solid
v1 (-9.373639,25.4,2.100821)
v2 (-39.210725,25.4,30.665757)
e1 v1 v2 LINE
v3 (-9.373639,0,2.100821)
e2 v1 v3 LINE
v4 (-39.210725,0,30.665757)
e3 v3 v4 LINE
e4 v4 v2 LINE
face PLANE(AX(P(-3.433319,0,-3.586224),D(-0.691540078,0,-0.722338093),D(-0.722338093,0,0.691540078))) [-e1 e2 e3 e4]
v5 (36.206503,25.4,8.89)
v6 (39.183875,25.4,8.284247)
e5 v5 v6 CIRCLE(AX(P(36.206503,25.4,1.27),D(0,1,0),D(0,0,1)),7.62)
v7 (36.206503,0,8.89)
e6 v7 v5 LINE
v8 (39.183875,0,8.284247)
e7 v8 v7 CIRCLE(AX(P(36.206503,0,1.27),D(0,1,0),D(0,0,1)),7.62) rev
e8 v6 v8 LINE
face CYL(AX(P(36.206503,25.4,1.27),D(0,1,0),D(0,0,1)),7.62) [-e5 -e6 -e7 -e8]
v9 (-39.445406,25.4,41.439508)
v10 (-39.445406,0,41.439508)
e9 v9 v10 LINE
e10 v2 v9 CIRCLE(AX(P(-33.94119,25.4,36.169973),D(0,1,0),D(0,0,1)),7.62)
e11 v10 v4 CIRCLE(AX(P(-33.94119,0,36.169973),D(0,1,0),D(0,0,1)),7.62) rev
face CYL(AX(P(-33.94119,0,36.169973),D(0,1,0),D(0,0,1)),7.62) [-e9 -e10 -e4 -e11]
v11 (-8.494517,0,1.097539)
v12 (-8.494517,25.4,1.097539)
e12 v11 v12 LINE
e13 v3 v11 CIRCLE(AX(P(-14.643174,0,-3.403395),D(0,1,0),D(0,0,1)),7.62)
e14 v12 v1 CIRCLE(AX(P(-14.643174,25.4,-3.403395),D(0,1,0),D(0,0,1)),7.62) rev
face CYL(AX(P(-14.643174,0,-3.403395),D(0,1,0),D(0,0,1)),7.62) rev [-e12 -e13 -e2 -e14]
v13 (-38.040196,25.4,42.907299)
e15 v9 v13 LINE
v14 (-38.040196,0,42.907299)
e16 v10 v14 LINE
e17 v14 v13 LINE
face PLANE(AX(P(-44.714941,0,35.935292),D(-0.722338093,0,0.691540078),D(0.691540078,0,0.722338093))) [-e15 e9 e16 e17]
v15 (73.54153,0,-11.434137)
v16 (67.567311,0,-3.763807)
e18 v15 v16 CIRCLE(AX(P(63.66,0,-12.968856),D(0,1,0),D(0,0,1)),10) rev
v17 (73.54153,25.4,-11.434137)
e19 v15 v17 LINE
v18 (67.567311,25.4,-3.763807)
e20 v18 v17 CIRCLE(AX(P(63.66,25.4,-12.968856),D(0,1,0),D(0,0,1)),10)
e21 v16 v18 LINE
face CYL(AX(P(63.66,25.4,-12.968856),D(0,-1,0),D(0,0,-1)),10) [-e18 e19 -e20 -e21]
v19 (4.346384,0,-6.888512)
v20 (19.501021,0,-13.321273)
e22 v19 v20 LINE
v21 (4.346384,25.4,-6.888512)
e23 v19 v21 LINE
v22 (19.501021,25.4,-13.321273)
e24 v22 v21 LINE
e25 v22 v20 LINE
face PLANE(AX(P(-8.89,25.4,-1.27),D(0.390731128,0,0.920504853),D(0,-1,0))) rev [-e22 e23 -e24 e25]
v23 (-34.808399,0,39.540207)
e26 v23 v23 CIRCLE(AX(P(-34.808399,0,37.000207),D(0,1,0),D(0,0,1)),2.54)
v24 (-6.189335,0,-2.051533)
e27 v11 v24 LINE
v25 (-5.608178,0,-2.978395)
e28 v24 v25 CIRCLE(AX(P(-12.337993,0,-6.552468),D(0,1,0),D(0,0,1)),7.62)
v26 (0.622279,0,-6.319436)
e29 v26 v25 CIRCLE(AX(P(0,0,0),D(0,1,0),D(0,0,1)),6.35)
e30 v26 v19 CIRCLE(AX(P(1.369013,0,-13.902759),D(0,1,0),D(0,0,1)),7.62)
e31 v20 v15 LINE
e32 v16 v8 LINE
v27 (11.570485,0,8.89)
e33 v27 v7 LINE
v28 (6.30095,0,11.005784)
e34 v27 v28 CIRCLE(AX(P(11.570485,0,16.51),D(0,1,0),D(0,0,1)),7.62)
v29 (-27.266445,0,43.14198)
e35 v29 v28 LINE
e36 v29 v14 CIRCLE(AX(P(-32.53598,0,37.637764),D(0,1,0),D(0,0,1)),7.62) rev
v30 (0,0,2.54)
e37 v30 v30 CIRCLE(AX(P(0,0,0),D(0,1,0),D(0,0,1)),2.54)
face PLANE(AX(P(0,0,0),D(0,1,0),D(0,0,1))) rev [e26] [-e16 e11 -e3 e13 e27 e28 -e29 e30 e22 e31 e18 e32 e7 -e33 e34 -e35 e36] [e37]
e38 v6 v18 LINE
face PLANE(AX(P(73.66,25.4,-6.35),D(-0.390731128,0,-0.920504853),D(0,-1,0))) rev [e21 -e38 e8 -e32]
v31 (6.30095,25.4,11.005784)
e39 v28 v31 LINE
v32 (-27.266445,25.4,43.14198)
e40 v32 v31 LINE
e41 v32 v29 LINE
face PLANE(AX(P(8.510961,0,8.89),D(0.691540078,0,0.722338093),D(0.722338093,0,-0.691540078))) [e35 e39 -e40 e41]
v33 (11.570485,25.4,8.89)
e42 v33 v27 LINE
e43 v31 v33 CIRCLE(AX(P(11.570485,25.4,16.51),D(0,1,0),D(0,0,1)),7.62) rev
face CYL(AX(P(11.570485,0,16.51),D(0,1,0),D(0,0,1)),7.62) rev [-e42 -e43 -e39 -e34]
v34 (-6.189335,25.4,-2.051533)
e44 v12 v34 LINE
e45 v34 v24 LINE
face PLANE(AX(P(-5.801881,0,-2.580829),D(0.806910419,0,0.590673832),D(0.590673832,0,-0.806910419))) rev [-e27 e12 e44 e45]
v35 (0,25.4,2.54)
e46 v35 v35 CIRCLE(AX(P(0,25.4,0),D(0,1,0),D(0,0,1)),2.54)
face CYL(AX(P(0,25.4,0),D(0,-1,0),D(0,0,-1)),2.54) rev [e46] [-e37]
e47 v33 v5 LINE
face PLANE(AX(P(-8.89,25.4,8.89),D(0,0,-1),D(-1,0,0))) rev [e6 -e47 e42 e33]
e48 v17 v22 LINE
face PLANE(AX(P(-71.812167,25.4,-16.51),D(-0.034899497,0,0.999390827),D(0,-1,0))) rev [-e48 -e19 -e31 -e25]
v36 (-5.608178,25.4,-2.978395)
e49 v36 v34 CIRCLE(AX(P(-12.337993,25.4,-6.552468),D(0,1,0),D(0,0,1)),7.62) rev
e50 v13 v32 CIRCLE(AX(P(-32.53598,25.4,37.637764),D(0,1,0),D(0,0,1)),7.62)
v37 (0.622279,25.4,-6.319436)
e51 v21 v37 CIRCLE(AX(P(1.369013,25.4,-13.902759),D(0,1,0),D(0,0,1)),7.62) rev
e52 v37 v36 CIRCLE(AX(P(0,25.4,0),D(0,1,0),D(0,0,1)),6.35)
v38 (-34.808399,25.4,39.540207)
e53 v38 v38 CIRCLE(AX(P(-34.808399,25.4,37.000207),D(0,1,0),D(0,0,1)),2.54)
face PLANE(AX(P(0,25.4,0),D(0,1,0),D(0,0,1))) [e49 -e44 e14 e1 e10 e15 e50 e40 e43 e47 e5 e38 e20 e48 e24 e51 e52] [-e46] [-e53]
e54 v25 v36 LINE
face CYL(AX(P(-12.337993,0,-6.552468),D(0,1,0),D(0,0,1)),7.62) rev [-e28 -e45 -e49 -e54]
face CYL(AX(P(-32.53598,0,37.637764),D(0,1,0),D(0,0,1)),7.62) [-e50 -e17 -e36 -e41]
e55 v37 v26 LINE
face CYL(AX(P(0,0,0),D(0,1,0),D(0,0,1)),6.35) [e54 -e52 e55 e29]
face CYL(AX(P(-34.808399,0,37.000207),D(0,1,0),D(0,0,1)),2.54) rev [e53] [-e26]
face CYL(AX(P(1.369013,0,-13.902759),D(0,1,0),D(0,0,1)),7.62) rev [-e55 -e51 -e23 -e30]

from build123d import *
from OCP.BRepFilletAPI import BRepFilletAPI_MakeChamfer

# Parameters (mm, degrees)
SKETCH1_W           = 82.55
SKETCH1_H           = 25.4
SKETCH1_R           = 2.54
BOSS_EXTRUDE1_DEPTH = 25.4
CHAMFER1_SIZE       = 15.24
CHAMFER1_SIZE2      = 35.903190055
FILLET1_R           = 10
CHAMFER2_SIZE       = 5.08
CHAMFER2_SIZE_2     = 145.472166677
BOSS_EXTRUDE2_DEPTH = 25.4
SKETCH3_R           = 2.54
CUT_EXTRUDE1_DEPTH  = 92.63619095
SKETCH4_R           = 2.54
CUT_EXTRUDE2_DEPTH  = 92.63619095
FILLET3_R           = 7.62
FILLET4_R           = 7.62
SKETCH5_R           = 6.35
SKETCH5_R_2         = 2.54
BOSS_EXTRUDE3_DEPTH = 25.4
FILLET5_R           = 7.62
CUT_EXTRUDE3_DEPTH  = 91.009898604
FILLET6_R           = 7.62


with BuildPart() as part:
    # Sketch1 → Boss-Extrude1 (new body)
    with BuildSketch(Plane(origin=(0, 0, 0), x_dir=(1, 0, 0), z_dir=(0, 1, 0))):
        with Locations((32.385, 3.81)):
            Rectangle(SKETCH1_W, SKETCH1_H)
        with Locations(Location((0, 0, 0), (0, 0, 270))):
            Circle(SKETCH1_R, mode=Mode.SUBTRACT)
    extrude(amount=BOSS_EXTRUDE1_DEPTH)

    # Chamfer1: one chamfer whose edges measure the first distance from different faces: ONE call of the kernel's chamfer builder (chamfer() names one face for all edges)
    chamfer1_edges_1 = [part.edges().sort_by_distance(p)[0] for p in [
        (-8.89, 12.7, -16.51),
    ]]
    chamfer1_side_1 = [part.faces().sort_by_distance(p)[0] for p in [
        (-8.89, 12.7, -3.81),
    ]]
    chamfer1_edges_2 = [part.edges().sort_by_distance(p)[0] for p in [
        (73.66, 12.7, 8.89),
    ]]
    chamfer1_side_2 = [part.faces().sort_by_distance(p)[0] for p in [
        (73.66, 12.7, -3.81),
    ]]
    chamfer1 = BRepFilletAPI_MakeChamfer(part.part.solid().wrapped)
    for e in chamfer1_edges_1:
        chamfer1.Add(CHAMFER1_SIZE, CHAMFER1_SIZE2, e.wrapped, chamfer1_side_1[0].wrapped)  # the first distance lies on this face
    for e in chamfer1_edges_2:
        chamfer1.Add(CHAMFER1_SIZE, CHAMFER1_SIZE2, e.wrapped, chamfer1_side_2[0].wrapped)  # the first distance lies on this face
    add(Compound.cast(chamfer1.Shape()), mode=Mode.REPLACE)

    # Fillet1
    fillet1_edges = [part.edges().sort_by_distance(p)[0] for p in [
        (73.66, 12.7, -6.35),
    ]]
    fillet(fillet1_edges, radius=FILLET1_R)

    # Chamfer2
    # the kernel refuses this chamfer: 145.472166677, 5.08 mm, written as the material it takes off along each edge
    with BuildSketch(Plane(origin=(73.66, -378.219112331, -16.51), x_dir=(0.7401679873250444, 0, 0.6724220033127953), z_dir=(0, 1, 0))) as chamfer2_piece_1:
        Polygon((CHAMFER2_SIZE * 0.672422003313, -CHAMFER2_SIZE * 0.740167987325), (-CHAMFER2_SIZE_2 * 0.740167987326, -CHAMFER2_SIZE_2 * 0.672422003314), (0, 0), align=None)
    extrude(amount=781.838224662, mode=Mode.SUBTRACT)

    # Sketch2 → Boss-Extrude2 (add)
    with BuildSketch(Plane(origin=(0, 25.4, 0), x_dir=(1, 0, 0), z_dir=(0, 1, 0))):
        Polygon((-3.433319289, 3.586223542), (-44.714941303, -35.935291914), (-32.770661076, -48.411515456), (8.510960938, -8.89), align=None)
    extrude(amount=-BOSS_EXTRUDE2_DEPTH)

    # Sketch3 → Cut-Extrude1 (cut, through all)
    with BuildSketch(Plane(origin=(0, 25.4, 0), x_dir=(1, 0, 0), z_dir=(0, 1, 0))):
        with Locations(Location((0, 0, 0), (0, 0, 270))):
            Circle(SKETCH3_R)
    extrude(amount=-CUT_EXTRUDE1_DEPTH, mode=Mode.SUBTRACT)

    # Sketch4 → Cut-Extrude2 (cut, through all)
    with BuildSketch(Plane(origin=(0, 25.4, 0), x_dir=(1, 0, 0), z_dir=(0, 1, 0))):
        with Locations(Location((-34.808399123, -37.000207438, 0), (0, 0, 270))):
            Circle(SKETCH4_R)
    extrude(amount=-CUT_EXTRUDE2_DEPTH, mode=Mode.SUBTRACT)

    # Fillet3
    fillet3_edges = [part.edges().sort_by_distance(p)[0] for p in [
        (-44.714941303, 12.7, 35.935291914),
        (-32.770661076, 12.7, 48.411515456),
    ]]
    fillet(fillet3_edges, radius=FILLET3_R)

    # Fillet4
    fillet4_edges = [part.edges().sort_by_distance(p)[0] for p in [
        (37.756809945, 12.7, 8.89),
        (8.510960938, 12.7, 8.89),
    ]]
    fillet(fillet4_edges, radius=FILLET4_R)

    # Sketch5 → Boss-Extrude3 (add)
    with BuildSketch(Plane(origin=(0, 25.4, 0), x_dir=(1, 0, 0), z_dir=(0, 1, 0))):
        Circle(SKETCH5_R)
        with Locations(Location((0, 0, 0), (0, 0, 270))):
            Circle(SKETCH5_R_2, mode=Mode.SUBTRACT)
    extrude(amount=-BOSS_EXTRUDE3_DEPTH)

    # Fillet5
    fillet5_edges = [part.edges().sort_by_distance(p)[0] for p in [
        (2.173832351, 12.7, -5.966318204),
    ]]
    fillet(fillet5_edges, radius=FILLET5_R)

    # Sketch6 → Cut-Extrude3 (cut, through all)
    with BuildSketch(Plane(origin=(0, 25.4, 0), x_dir=(1, 0, 0), z_dir=(0, 1, 0))):
        Polygon((-5.801880984, 2.580828752), (-8.89, -1.637803048), (-8.89, 1.27), align=None)
    extrude(amount=-CUT_EXTRUDE3_DEPTH, mode=Mode.SUBTRACT)

    # Fillet6
    fillet6_edges = [part.edges().sort_by_distance(p)[0] for p in [
        (-5.801880984, 12.7, -2.580828752),
        (-8.89, 12.7, 1.637803048),
    ]]
    fillet(fillet6_edges, radius=FILLET6_R)


solid = part.part
